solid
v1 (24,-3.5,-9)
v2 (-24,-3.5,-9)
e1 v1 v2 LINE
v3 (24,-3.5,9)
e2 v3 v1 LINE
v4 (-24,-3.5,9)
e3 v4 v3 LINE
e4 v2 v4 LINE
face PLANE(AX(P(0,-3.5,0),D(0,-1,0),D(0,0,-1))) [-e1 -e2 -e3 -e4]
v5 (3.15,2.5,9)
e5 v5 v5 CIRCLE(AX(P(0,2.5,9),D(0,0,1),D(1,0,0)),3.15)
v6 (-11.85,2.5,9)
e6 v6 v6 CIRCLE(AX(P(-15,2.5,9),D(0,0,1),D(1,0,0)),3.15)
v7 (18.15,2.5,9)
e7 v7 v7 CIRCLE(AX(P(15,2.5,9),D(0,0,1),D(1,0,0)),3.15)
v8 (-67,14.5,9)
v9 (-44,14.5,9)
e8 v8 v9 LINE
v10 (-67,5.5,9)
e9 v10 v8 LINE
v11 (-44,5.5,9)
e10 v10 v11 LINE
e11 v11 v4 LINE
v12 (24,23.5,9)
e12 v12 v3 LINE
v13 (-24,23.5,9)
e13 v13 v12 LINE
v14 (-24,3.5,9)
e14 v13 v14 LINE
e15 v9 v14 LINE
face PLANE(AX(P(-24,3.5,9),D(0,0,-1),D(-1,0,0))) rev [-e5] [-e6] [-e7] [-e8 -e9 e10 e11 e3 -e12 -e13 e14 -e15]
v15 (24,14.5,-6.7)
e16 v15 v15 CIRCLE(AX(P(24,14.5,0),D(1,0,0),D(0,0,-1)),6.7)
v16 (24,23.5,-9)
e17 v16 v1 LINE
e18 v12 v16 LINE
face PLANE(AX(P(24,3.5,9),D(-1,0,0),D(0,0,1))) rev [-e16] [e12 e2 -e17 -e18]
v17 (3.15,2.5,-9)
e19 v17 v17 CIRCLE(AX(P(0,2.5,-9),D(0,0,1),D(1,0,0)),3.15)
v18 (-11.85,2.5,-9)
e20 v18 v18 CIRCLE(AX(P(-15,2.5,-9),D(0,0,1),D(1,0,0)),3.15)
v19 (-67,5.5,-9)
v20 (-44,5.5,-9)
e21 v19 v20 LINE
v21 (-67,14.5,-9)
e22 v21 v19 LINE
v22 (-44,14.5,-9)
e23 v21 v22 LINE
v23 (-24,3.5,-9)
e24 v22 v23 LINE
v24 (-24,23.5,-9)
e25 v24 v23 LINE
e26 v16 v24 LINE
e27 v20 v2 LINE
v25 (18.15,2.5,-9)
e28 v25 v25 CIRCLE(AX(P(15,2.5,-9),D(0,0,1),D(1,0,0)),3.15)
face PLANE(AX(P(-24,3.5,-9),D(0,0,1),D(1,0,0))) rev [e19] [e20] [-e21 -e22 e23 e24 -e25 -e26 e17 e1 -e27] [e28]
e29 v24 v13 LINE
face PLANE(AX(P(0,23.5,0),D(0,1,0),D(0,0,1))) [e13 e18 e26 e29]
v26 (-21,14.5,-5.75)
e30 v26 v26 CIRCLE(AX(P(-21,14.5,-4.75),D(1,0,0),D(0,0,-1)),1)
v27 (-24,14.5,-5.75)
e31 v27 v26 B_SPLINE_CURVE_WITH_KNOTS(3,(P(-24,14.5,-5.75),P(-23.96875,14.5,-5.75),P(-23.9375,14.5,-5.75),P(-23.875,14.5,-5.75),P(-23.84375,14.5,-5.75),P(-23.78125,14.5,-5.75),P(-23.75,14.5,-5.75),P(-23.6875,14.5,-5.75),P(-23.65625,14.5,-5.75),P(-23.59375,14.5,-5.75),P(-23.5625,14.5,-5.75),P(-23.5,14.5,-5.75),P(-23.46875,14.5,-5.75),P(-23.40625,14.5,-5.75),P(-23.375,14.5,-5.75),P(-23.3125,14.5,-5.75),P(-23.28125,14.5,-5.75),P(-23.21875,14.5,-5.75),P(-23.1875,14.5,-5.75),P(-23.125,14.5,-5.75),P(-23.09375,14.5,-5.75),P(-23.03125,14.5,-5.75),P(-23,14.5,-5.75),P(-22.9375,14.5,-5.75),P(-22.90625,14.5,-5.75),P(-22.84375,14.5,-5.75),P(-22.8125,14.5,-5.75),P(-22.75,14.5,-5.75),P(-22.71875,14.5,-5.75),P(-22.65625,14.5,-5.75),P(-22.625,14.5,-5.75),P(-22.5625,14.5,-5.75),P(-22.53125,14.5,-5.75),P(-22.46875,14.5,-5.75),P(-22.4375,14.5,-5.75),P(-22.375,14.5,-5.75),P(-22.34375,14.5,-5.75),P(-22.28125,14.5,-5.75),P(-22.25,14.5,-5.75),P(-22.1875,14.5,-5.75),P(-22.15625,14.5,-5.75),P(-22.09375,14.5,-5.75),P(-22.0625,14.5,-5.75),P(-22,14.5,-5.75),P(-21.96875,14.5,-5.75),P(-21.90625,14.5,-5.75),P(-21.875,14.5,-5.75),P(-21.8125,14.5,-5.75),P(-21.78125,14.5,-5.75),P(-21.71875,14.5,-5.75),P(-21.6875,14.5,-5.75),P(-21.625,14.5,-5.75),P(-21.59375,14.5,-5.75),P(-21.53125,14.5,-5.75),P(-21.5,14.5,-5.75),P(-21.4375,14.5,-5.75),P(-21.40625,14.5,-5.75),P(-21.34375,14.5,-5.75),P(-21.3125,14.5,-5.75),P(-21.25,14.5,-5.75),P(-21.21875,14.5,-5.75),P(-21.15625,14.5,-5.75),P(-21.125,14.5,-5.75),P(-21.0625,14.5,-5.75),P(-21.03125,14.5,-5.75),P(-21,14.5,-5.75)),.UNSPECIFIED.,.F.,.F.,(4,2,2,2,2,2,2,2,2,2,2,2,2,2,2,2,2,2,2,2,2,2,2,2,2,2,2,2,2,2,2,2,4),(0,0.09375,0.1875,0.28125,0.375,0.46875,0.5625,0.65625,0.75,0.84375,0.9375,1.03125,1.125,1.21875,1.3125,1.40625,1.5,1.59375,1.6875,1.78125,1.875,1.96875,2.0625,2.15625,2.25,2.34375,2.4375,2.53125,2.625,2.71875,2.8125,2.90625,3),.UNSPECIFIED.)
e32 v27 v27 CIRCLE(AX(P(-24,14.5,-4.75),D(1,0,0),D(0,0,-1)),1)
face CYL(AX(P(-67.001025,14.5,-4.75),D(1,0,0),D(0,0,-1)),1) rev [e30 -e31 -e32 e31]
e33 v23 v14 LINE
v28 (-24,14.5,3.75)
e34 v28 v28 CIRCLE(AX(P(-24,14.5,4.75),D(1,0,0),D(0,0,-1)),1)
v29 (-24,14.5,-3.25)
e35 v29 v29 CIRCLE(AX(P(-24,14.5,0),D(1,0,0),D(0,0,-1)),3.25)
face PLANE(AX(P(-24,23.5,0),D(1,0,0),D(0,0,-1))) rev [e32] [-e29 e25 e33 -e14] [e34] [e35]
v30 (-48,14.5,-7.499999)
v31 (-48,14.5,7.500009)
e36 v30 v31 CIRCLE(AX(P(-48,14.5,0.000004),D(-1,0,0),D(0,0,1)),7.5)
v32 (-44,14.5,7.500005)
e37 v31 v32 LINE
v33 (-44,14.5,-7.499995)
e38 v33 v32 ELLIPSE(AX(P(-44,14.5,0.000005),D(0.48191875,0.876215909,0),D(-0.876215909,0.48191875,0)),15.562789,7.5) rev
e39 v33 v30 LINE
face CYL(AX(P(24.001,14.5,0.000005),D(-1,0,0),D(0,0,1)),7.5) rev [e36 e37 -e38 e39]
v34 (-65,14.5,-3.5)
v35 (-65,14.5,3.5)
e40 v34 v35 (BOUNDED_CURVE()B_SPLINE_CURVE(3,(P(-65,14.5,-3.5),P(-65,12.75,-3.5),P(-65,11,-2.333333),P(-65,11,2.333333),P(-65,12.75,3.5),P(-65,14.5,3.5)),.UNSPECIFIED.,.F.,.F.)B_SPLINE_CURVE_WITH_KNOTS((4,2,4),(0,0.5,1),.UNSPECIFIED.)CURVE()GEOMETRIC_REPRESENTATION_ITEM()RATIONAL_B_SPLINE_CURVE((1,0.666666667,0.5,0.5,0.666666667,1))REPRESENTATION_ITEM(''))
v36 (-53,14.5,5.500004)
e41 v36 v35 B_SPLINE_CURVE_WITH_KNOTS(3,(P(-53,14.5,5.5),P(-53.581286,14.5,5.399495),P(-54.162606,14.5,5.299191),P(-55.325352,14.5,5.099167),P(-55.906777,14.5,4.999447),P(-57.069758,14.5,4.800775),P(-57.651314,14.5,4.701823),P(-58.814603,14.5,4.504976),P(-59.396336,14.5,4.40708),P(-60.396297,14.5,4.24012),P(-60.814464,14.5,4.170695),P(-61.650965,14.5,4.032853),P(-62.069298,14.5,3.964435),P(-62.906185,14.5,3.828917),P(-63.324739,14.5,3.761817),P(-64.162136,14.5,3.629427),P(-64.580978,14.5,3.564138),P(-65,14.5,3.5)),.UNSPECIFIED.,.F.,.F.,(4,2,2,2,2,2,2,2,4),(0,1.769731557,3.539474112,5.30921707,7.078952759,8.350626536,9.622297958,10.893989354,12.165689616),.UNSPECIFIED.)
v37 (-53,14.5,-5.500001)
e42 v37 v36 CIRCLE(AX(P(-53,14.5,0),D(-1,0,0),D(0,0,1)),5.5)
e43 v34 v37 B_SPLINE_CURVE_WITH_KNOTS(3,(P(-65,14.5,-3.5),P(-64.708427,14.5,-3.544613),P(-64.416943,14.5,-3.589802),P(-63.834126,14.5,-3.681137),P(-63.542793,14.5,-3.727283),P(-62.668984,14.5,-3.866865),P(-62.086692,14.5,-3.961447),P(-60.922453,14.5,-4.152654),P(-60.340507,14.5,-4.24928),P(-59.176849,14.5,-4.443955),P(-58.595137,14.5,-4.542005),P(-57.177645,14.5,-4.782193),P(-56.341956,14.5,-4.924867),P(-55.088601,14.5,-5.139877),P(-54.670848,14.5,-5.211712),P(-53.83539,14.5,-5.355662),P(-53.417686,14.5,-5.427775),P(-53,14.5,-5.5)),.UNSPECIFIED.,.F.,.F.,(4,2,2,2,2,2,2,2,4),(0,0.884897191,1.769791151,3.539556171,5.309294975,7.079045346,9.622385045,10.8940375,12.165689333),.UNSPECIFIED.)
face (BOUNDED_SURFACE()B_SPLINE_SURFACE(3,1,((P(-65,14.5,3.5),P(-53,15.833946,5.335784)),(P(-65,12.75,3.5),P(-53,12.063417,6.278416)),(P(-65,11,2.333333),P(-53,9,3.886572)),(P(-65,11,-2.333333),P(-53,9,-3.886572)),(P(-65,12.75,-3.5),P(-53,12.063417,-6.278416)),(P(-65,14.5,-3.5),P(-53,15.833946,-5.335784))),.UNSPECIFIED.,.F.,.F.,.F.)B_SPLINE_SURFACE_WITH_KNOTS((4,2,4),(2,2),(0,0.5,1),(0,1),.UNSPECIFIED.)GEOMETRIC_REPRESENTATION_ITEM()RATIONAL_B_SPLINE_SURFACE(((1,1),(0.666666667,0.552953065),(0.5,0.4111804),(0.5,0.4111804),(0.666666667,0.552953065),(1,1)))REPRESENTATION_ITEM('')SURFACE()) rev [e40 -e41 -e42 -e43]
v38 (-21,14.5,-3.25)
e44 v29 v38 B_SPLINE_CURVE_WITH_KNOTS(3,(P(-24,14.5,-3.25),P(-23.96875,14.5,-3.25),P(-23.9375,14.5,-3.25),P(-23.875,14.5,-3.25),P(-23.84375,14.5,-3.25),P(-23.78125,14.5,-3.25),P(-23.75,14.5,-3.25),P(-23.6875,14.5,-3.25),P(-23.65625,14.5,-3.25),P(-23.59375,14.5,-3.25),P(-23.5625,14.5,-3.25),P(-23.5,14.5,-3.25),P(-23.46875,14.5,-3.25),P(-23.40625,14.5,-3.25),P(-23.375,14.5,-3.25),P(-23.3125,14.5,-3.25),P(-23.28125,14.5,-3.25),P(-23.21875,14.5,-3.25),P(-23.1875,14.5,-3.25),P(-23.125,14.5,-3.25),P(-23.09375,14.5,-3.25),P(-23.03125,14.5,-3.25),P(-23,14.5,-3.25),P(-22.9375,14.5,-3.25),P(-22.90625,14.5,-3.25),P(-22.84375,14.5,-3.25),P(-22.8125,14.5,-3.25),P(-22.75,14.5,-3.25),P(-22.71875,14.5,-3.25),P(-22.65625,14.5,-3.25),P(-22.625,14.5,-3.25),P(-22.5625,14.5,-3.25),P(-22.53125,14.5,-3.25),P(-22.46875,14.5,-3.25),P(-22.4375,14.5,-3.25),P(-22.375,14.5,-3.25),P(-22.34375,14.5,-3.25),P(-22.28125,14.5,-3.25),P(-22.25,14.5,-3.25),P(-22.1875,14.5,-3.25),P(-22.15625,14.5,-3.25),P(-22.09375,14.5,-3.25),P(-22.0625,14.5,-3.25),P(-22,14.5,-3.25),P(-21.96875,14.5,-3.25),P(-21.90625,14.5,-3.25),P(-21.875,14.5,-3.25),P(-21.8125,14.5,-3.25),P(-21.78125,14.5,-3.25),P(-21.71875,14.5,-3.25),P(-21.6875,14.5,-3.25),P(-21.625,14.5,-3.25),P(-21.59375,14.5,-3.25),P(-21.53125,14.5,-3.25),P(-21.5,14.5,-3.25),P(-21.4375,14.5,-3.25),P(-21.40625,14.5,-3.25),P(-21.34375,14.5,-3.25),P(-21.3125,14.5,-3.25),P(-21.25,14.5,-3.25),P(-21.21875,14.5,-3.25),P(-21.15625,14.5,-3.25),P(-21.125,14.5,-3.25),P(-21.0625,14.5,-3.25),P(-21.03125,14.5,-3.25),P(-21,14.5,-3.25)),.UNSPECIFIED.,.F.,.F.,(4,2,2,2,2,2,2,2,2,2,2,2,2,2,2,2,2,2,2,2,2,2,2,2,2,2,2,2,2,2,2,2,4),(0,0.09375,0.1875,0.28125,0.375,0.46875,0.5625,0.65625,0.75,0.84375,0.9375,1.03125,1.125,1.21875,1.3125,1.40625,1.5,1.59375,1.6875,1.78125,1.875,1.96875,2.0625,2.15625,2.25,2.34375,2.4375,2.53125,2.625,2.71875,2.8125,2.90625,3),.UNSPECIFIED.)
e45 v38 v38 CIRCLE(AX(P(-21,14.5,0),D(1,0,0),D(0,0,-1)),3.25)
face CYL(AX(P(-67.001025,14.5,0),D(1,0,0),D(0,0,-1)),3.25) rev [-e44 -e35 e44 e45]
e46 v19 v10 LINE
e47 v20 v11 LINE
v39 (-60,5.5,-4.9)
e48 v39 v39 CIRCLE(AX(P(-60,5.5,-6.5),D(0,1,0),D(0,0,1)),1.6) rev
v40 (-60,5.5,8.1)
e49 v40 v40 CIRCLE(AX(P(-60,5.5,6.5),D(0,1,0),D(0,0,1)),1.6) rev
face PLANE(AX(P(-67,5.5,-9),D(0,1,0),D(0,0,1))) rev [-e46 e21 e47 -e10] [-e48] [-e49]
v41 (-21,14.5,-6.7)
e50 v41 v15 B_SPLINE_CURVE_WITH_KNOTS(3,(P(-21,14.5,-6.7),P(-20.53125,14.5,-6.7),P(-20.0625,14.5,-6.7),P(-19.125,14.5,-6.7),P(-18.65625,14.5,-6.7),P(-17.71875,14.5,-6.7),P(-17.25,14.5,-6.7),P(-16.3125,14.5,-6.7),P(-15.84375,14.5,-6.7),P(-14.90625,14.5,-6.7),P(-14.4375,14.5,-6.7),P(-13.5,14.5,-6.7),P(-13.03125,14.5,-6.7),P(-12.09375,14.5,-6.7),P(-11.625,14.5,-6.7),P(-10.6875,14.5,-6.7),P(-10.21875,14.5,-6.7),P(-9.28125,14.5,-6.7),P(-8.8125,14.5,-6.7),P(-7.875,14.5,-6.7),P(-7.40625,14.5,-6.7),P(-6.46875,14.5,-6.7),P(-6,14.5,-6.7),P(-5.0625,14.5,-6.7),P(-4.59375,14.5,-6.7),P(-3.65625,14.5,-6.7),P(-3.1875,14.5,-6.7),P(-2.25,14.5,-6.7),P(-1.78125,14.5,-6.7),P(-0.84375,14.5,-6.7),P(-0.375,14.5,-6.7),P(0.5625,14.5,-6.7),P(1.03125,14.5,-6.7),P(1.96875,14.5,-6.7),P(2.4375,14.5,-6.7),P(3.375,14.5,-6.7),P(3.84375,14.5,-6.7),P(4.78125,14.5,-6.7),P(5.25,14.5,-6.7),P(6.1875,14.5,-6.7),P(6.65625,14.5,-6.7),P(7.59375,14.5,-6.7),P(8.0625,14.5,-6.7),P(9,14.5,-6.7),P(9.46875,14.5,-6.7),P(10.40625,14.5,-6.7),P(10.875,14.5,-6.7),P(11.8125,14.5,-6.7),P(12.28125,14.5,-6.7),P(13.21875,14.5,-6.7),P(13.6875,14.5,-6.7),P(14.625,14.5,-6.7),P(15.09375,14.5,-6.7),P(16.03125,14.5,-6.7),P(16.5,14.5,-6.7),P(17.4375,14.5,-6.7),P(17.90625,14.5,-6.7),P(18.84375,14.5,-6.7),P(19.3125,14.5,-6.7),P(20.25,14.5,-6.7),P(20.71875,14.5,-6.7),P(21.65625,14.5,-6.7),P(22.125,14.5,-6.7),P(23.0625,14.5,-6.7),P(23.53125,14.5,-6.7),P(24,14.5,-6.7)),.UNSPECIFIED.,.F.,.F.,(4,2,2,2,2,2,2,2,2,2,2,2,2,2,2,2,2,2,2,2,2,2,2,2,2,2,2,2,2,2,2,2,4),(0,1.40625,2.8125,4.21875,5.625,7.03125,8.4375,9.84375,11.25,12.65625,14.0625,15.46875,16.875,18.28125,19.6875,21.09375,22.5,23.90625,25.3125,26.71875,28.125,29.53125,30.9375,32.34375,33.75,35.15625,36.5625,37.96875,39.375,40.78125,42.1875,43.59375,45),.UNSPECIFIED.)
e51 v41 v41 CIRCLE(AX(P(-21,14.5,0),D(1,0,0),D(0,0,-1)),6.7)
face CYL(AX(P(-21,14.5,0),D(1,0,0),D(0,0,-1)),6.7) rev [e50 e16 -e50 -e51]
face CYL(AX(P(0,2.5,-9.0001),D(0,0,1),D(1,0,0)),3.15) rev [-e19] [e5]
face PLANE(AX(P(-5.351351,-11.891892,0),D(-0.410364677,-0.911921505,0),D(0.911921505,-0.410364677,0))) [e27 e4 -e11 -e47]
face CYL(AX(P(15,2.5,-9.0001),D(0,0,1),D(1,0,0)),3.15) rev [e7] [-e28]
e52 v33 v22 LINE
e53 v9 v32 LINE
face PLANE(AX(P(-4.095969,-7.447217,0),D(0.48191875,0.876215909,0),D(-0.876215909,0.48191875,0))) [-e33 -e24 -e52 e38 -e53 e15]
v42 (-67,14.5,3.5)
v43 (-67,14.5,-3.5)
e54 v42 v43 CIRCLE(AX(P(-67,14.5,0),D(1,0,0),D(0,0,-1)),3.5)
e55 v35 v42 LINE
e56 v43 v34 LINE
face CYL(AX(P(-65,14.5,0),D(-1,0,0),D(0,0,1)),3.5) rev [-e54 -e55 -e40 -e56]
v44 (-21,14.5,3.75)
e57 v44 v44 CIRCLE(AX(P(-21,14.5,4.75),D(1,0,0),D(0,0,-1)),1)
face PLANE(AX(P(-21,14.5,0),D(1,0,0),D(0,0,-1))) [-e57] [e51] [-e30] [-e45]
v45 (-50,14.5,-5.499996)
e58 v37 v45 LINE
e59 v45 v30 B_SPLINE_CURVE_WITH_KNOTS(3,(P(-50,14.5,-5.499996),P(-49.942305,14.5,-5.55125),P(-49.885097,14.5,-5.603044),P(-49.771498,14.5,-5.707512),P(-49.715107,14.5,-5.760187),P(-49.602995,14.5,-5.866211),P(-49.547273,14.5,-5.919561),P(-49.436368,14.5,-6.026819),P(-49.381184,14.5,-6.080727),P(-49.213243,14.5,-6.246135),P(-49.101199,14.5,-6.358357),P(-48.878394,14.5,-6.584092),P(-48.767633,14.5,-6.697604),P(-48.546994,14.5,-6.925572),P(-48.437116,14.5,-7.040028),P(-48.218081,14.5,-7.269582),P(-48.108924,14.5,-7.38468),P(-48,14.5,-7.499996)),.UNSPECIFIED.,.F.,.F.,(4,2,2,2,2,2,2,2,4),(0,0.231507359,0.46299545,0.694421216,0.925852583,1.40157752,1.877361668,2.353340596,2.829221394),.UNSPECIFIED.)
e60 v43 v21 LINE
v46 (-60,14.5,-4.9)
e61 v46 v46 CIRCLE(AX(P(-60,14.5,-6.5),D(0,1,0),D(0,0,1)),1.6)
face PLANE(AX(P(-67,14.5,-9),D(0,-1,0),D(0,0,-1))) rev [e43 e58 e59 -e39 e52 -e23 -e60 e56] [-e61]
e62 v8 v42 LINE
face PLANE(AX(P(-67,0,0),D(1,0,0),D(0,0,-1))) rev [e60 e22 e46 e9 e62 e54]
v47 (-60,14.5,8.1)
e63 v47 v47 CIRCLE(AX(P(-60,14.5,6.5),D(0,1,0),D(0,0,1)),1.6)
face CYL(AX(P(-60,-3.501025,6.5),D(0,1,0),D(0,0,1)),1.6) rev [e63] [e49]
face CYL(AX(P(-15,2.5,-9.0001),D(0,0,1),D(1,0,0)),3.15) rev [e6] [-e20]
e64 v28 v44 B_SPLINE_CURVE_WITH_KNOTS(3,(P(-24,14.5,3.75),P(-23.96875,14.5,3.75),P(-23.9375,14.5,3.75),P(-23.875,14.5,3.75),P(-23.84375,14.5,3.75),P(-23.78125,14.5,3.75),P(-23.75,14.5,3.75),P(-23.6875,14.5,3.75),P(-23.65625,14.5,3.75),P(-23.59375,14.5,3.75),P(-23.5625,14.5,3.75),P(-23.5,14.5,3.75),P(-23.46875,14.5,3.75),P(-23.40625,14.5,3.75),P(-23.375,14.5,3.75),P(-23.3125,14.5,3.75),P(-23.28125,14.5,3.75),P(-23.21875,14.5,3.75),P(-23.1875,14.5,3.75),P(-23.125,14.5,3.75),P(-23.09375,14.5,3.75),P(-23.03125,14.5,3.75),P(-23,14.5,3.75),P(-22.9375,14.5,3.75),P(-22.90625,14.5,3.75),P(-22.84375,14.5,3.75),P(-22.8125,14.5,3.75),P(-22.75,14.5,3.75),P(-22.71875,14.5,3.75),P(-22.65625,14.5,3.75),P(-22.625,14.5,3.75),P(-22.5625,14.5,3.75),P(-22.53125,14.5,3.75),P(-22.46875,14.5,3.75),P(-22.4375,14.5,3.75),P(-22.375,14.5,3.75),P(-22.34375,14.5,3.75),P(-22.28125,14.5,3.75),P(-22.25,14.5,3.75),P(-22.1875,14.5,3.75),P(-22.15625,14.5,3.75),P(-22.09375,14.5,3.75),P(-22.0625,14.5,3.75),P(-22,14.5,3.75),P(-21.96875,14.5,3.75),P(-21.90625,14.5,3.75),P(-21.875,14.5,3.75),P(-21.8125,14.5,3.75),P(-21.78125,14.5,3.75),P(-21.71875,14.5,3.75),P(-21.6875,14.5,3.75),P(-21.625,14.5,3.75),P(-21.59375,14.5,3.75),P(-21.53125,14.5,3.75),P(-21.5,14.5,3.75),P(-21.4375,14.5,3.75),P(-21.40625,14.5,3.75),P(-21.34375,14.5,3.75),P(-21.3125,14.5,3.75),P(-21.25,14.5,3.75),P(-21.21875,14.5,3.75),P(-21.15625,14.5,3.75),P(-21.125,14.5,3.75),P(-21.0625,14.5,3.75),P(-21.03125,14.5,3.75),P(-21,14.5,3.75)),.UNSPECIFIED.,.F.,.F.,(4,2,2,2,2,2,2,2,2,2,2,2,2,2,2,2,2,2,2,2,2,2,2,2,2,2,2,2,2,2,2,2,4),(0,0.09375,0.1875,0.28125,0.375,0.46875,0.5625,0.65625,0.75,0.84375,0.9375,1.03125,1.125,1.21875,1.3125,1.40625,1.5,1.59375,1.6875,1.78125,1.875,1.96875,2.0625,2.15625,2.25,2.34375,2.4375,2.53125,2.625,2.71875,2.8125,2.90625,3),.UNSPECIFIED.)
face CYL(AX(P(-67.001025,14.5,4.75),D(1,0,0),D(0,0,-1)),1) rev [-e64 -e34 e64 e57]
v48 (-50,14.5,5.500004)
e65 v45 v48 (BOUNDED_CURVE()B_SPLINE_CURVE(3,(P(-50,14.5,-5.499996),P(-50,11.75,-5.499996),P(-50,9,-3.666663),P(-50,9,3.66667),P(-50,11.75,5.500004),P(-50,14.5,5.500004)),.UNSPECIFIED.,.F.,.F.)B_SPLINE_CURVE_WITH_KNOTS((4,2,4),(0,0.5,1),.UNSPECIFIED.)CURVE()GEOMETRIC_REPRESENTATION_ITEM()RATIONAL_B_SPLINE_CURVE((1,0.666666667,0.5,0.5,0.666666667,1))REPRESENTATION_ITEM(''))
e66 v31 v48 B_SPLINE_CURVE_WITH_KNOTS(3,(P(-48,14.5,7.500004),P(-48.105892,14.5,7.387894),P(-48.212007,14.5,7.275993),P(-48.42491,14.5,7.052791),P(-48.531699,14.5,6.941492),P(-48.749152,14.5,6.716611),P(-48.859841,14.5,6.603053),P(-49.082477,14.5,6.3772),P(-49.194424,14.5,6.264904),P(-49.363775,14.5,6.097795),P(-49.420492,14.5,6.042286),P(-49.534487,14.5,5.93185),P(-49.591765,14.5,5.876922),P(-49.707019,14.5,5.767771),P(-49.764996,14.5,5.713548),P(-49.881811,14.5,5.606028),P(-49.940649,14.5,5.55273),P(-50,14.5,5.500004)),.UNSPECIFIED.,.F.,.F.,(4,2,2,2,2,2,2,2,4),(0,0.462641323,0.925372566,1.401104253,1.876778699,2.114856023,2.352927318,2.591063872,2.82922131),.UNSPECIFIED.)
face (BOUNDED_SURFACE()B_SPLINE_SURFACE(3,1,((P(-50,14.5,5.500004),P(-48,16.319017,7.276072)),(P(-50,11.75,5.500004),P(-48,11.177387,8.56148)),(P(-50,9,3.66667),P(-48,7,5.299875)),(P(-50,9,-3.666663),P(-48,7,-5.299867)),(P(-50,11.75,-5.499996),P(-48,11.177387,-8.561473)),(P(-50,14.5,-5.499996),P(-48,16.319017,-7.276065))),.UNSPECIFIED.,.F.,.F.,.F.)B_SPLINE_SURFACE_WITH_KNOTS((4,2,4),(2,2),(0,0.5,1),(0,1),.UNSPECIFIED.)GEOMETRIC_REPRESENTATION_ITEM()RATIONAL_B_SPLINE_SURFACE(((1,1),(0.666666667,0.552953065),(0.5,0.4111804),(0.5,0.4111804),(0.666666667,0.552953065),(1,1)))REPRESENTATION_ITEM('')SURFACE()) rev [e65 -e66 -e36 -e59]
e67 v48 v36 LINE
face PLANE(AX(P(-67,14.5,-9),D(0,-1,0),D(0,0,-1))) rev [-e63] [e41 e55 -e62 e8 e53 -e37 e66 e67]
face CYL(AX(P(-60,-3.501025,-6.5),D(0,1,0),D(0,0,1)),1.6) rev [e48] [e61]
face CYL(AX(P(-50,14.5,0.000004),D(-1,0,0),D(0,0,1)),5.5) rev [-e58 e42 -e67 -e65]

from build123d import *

# Parameters (mm, degrees)
SKETCH_1_W          = 48
SKETCH_1_H          = 18
EXTRUDE_1_DEPTH     = 3.5
SKETCH_6_W          = 18
SKETCH_6_H          = 9
EXTRUDE_4_DEPTH     = 23
SKETCH_7_R          = 3.5
CUT_EXTRUDE_1_DEPTH = 2
SKETCH_9_R          = 5.5
CUT_EXTRUDE_4_DEPTH = 3
CUT_EXTRUDE_5_REACH = 75.995
SKETCH_10_R         = 7.5
CUT_EXTRUDE_6_REACH = 71.957
SKETCH_11_R         = 1.6
EXTRUDE_5_OUTLINE_W = 48
EXTRUDE_5_OUTLINE_H = 18
EXTRUDE_5_DEPTH     = 20
CUT_EXTRUDE_7_REACH = 96.415
SKETCH_13_R         = 3.25
SKETCH_13_R_2       = 1
SKETCH_15_R         = 6.7
CUT_EXTRUDE_8_DEPTH = 45
SKETCH_16_R         = 3.15
CUT_EXTRUDE_9_DEPTH = 74.247867011


with BuildPart() as part:
    # 草圖1 → 填料-伸長1 (new, symmetric)
    with BuildSketch(Plane(origin=(0, 0, 0), x_dir=(1, 0, 0), z_dir=(0, 1, 0))):
        Rectangle(SKETCH_1_W, SKETCH_1_H)
    extrude(amount=EXTRUDE_1_DEPTH, both=True)

    # Sketch 3D_3 → Loft 1 section 0
    with BuildSketch(Plane(origin=(-44, 14.5, -9), x_dir=(0, -0.447213595499958, 0.894427190999916), z_dir=(-1, 0, 0))):
        with BuildLine():
            Line((0, 0), (16.099689438, 8.049844719))
            Line((16.099689438, 8.049844719), (20.124611797, 0))
            Line((20.124611797, 0), (4.024922359, -8.049844719))
            Line((4.024922359, -8.049844719), (0, 0))
        make_face()
    # 草圖5 → Loft 1 section 1
    with BuildSketch(Plane.ZY.offset(24)):
        with BuildLine():
            Line((-9, 3.5), (9, 3.5))
            Line((9, 3.5), (9, -3.5))
            Line((9, -3.5), (-9, -3.5))
            Line((-9, -3.5), (-9, 3.5))
        make_face()
    loft()

    # 草圖6 → 填料-伸長4 (add)
    with BuildSketch(Plane.ZY.offset(44)):
        with Locations((0, 10)):
            Rectangle(SKETCH_6_W, SKETCH_6_H)
    extrude(amount=EXTRUDE_4_DEPTH)

    # 草圖7 → 除料-伸長1 (cut)
    with BuildSketch(Plane.ZY.offset(67)):
        with Locations((0, 14.5)):
            Circle(SKETCH_7_R)
    extrude(amount=-CUT_EXTRUDE_1_DEPTH, mode=Mode.SUBTRACT)

    # Loft 1 2: read off the stored shape, not the designer's step
    # Loft 1 2: loft between two sections, ruled curve by curve
    loft_1_2_from = [
        Edge.make_bspline([(-65, 14.5, 3.5), (-65, 12.75, 3.5), (-65, 11, 2.333333333), (-65, 11, -2.333333333), (-65, 12.75, -3.5), (-65, 14.5, -3.5)], [0, 0, 0, 0, 0.5, 0.5, 1, 1, 1, 1], 3, [1, 0.666666667, 0.5, 0.5, 0.666666667, 1]),
        Edge.make_line((-65, 14.5, -3.5), (-65, 14.5, 3.5)),
    ]
    loft_1_2_to = [
        Edge.make_bspline([(-53, 15.833945938, 5.335783751), (-53, 12.063417219, 6.27841593), (-53, 9, 3.886572043), (-53, 9, -3.886572043), (-53, 12.063417219, -6.27841593), (-53, 15.833945938, -5.335783751)], [0, 0, 0, 0, 0.5, 0.5, 1, 1, 1, 1], 3, [1, 0.552953065, 0.4111804, 0.4111804, 0.552953065, 1]),
        Edge.make_line((-53, 15.833945938, -5.335783751), (-53, 15.833945938, 5.335783751)),
    ]
    loft_1_2 = Solid(Shell([*[Face.make_surface_from_curves(loft_1_2_from[k], loft_1_2_to[k]) for k in range(2)], Face(Wire(loft_1_2_from)), Face(Wire(loft_1_2_to))]))
    add(loft_1_2, mode=Mode.SUBTRACT)

    # 草圖9 → 除料-伸長4 (cut)
    with BuildSketch(Plane.ZY.offset(53)):
        with Locations((3.554e-06, 14.500000002)):
            Circle(SKETCH_9_R)
    extrude(amount=-CUT_EXTRUDE_4_DEPTH, mode=Mode.SUBTRACT)

    # 除料-疊層拉伸4: read off the stored shape, not the designer's step
    # 除料-疊層拉伸4: loft between two sections, ruled curve by curve
    loft_4_from = [
        Edge.make_bspline([(-50, 14.5, 5.500003554), (-50, 11.750000001, 5.500003553), (-50, 9.000000002, 3.66667022), (-50, 9.000000002, -3.666663111), (-50, 11.750000001, -5.499996445), (-50, 14.5, -5.499996446)], [0, 0, 0, 0, 0.5, 0.5, 1, 1, 1, 1], 3, [1, 0.666666667, 0.5, 0.5, 0.666666667, 1]),
        Edge.make_line((-50, 14.5, -5.499996446), (-50, 14.5, 5.500003554)),
    ]
    loft_4_to = [
        Edge.make_bspline([(-48, 16.319017189, 7.276072306), (-48, 11.177387119, 8.561479823), (-48, 7.000000002, 5.299874521), (-48, 7.000000002, -5.299867413), (-48, 11.177387119, -8.561472714), (-48, 16.319017189, -7.276065197)], [0, 0, 0, 0, 0.5, 0.5, 1, 1, 1, 1], 3, [1, 0.552953065, 0.4111804, 0.4111804, 0.552953065, 1]),
        Edge.make_line((-48, 16.319017189, -7.276065197), (-48, 16.319017189, 7.276072306)),
    ]
    loft_4 = Solid(Shell([*[Face.make_surface_from_curves(loft_4_from[k], loft_4_to[k]) for k in range(2)], Face(Wire(loft_4_from)), Face(Wire(loft_4_to))]))
    add(loft_4, mode=Mode.SUBTRACT)

    # 草圖10 → 除料-伸長5 (cut, up to next)
    with BuildSketch(Plane.ZY.offset(48), mode=Mode.PRIVATE) as cut_extrude_5_sk1:
        with Locations((4.786e-06, 14.500000002)):
            Circle(SKETCH_10_R)
    cut_extrude_5_tool1 = extrude(cut_extrude_5_sk1.sketch, amount=-CUT_EXTRUDE_5_REACH, mode=Mode.PRIVATE) & part.part
    add(cut_extrude_5_tool1.solids().sort_by_distance((-48, 14.5, 5e-06))[0], mode=Mode.SUBTRACT)

    # 草圖11 → 除料-伸長6 (cut, up to next)
    with BuildSketch(Plane(origin=(0, 14.5, 0), x_dir=(1, 0, 0), z_dir=(0, 1, 0)), mode=Mode.PRIVATE) as cut_extrude_6_sk1:
        with Locations(Location((-60, -6.5, 0), (0, 0, 270))):
            Circle(SKETCH_11_R)
    cut_extrude_6_tool1 = extrude(cut_extrude_6_sk1.sketch, amount=-CUT_EXTRUDE_6_REACH, mode=Mode.PRIVATE) & part.part
    # 草圖11 → 除料-伸長6 (cut, up to next)
    with BuildSketch(Plane(origin=(0, 14.5, 0), x_dir=(1, 0, 0), z_dir=(0, 1, 0)), mode=Mode.PRIVATE) as cut_extrude_6_sk2:
        with Locations(Location((-60, 6.5, 0), (0, 0, 270))):
            Circle(SKETCH_11_R)
    cut_extrude_6_tool2 = extrude(cut_extrude_6_sk2.sketch, amount=-CUT_EXTRUDE_6_REACH, mode=Mode.PRIVATE) & part.part
    add(cut_extrude_6_tool1.solids().sort_by_distance((-60, 14.5, 6.5))[0], mode=Mode.SUBTRACT)
    add(cut_extrude_6_tool2.solids().sort_by_distance((-60, 14.5, -6.5))[0], mode=Mode.SUBTRACT)

    # 填料-伸長5: read off the stored shape, not the designer's step
    # 填料-伸長5 outline → 填料-伸長5 (add)
    with BuildSketch(Plane(origin=(0, 3.5, 0), x_dir=(1, 0, 0), z_dir=(0, 1, 0))):
        Rectangle(EXTRUDE_5_OUTLINE_W, EXTRUDE_5_OUTLINE_H)
    extrude(amount=EXTRUDE_5_DEPTH)

    # 草圖13 → 除料-伸長7 (cut, up to next)
    with BuildSketch(Plane.ZY.offset(-24), mode=Mode.PRIVATE) as cut_extrude_7_sk1:
        with Locations(Location((0, 14.5, 0), (0, 0, 180))):
            Circle(SKETCH_13_R)
    cut_extrude_7_tool1 = extrude(cut_extrude_7_sk1.sketch, amount=CUT_EXTRUDE_7_REACH, mode=Mode.PRIVATE) & part.part
    # 草圖13 → 除料-伸長7 (cut, up to next)
    with BuildSketch(Plane.ZY.offset(-24), mode=Mode.PRIVATE) as cut_extrude_7_sk2:
        with Locations(Location((-4.75, 14.5, 0), (0, 0, 180))):
            Circle(SKETCH_13_R_2)
    cut_extrude_7_tool2 = extrude(cut_extrude_7_sk2.sketch, amount=CUT_EXTRUDE_7_REACH, mode=Mode.PRIVATE) & part.part
    # 草圖13 → 除料-伸長7 (cut, up to next)
    with BuildSketch(Plane.ZY.offset(-24), mode=Mode.PRIVATE) as cut_extrude_7_sk3:
        with Locations(Location((4.75, 14.5, 0), (0, 0, 180))):
            Circle(SKETCH_13_R_2)
    cut_extrude_7_tool3 = extrude(cut_extrude_7_sk3.sketch, amount=CUT_EXTRUDE_7_REACH, mode=Mode.PRIVATE) & part.part
    add(cut_extrude_7_tool1.solids().sort_by_distance((24, 14.5, 0))[0], mode=Mode.SUBTRACT)
    add(cut_extrude_7_tool2.solids().sort_by_distance((24, 14.5, -4.75))[0], mode=Mode.SUBTRACT)
    add(cut_extrude_7_tool3.solids().sort_by_distance((24, 14.5, 4.75))[0], mode=Mode.SUBTRACT)

    # 草圖15 → 除料-伸長8 (cut)
    with BuildSketch(Plane(origin=(24, 0, 0), x_dir=(0, 0, -1), z_dir=(1, 0, 0))):
        with Locations((0, 14.5)):
            Circle(SKETCH_15_R)
    extrude(amount=-CUT_EXTRUDE_8_DEPTH, mode=Mode.SUBTRACT)

    # 草圖16 → 除料-伸長9 (cut, through all)
    with BuildSketch(Plane.XY.offset(9)):
        with Locations((15, 2.5)):
            Circle(SKETCH_16_R)
        with Locations((0, 2.5)):
            Circle(SKETCH_16_R)
        with Locations((-15, 2.5)):
            Circle(SKETCH_16_R)
    extrude(amount=-CUT_EXTRUDE_9_DEPTH, mode=Mode.SUBTRACT)


solid = part.part
